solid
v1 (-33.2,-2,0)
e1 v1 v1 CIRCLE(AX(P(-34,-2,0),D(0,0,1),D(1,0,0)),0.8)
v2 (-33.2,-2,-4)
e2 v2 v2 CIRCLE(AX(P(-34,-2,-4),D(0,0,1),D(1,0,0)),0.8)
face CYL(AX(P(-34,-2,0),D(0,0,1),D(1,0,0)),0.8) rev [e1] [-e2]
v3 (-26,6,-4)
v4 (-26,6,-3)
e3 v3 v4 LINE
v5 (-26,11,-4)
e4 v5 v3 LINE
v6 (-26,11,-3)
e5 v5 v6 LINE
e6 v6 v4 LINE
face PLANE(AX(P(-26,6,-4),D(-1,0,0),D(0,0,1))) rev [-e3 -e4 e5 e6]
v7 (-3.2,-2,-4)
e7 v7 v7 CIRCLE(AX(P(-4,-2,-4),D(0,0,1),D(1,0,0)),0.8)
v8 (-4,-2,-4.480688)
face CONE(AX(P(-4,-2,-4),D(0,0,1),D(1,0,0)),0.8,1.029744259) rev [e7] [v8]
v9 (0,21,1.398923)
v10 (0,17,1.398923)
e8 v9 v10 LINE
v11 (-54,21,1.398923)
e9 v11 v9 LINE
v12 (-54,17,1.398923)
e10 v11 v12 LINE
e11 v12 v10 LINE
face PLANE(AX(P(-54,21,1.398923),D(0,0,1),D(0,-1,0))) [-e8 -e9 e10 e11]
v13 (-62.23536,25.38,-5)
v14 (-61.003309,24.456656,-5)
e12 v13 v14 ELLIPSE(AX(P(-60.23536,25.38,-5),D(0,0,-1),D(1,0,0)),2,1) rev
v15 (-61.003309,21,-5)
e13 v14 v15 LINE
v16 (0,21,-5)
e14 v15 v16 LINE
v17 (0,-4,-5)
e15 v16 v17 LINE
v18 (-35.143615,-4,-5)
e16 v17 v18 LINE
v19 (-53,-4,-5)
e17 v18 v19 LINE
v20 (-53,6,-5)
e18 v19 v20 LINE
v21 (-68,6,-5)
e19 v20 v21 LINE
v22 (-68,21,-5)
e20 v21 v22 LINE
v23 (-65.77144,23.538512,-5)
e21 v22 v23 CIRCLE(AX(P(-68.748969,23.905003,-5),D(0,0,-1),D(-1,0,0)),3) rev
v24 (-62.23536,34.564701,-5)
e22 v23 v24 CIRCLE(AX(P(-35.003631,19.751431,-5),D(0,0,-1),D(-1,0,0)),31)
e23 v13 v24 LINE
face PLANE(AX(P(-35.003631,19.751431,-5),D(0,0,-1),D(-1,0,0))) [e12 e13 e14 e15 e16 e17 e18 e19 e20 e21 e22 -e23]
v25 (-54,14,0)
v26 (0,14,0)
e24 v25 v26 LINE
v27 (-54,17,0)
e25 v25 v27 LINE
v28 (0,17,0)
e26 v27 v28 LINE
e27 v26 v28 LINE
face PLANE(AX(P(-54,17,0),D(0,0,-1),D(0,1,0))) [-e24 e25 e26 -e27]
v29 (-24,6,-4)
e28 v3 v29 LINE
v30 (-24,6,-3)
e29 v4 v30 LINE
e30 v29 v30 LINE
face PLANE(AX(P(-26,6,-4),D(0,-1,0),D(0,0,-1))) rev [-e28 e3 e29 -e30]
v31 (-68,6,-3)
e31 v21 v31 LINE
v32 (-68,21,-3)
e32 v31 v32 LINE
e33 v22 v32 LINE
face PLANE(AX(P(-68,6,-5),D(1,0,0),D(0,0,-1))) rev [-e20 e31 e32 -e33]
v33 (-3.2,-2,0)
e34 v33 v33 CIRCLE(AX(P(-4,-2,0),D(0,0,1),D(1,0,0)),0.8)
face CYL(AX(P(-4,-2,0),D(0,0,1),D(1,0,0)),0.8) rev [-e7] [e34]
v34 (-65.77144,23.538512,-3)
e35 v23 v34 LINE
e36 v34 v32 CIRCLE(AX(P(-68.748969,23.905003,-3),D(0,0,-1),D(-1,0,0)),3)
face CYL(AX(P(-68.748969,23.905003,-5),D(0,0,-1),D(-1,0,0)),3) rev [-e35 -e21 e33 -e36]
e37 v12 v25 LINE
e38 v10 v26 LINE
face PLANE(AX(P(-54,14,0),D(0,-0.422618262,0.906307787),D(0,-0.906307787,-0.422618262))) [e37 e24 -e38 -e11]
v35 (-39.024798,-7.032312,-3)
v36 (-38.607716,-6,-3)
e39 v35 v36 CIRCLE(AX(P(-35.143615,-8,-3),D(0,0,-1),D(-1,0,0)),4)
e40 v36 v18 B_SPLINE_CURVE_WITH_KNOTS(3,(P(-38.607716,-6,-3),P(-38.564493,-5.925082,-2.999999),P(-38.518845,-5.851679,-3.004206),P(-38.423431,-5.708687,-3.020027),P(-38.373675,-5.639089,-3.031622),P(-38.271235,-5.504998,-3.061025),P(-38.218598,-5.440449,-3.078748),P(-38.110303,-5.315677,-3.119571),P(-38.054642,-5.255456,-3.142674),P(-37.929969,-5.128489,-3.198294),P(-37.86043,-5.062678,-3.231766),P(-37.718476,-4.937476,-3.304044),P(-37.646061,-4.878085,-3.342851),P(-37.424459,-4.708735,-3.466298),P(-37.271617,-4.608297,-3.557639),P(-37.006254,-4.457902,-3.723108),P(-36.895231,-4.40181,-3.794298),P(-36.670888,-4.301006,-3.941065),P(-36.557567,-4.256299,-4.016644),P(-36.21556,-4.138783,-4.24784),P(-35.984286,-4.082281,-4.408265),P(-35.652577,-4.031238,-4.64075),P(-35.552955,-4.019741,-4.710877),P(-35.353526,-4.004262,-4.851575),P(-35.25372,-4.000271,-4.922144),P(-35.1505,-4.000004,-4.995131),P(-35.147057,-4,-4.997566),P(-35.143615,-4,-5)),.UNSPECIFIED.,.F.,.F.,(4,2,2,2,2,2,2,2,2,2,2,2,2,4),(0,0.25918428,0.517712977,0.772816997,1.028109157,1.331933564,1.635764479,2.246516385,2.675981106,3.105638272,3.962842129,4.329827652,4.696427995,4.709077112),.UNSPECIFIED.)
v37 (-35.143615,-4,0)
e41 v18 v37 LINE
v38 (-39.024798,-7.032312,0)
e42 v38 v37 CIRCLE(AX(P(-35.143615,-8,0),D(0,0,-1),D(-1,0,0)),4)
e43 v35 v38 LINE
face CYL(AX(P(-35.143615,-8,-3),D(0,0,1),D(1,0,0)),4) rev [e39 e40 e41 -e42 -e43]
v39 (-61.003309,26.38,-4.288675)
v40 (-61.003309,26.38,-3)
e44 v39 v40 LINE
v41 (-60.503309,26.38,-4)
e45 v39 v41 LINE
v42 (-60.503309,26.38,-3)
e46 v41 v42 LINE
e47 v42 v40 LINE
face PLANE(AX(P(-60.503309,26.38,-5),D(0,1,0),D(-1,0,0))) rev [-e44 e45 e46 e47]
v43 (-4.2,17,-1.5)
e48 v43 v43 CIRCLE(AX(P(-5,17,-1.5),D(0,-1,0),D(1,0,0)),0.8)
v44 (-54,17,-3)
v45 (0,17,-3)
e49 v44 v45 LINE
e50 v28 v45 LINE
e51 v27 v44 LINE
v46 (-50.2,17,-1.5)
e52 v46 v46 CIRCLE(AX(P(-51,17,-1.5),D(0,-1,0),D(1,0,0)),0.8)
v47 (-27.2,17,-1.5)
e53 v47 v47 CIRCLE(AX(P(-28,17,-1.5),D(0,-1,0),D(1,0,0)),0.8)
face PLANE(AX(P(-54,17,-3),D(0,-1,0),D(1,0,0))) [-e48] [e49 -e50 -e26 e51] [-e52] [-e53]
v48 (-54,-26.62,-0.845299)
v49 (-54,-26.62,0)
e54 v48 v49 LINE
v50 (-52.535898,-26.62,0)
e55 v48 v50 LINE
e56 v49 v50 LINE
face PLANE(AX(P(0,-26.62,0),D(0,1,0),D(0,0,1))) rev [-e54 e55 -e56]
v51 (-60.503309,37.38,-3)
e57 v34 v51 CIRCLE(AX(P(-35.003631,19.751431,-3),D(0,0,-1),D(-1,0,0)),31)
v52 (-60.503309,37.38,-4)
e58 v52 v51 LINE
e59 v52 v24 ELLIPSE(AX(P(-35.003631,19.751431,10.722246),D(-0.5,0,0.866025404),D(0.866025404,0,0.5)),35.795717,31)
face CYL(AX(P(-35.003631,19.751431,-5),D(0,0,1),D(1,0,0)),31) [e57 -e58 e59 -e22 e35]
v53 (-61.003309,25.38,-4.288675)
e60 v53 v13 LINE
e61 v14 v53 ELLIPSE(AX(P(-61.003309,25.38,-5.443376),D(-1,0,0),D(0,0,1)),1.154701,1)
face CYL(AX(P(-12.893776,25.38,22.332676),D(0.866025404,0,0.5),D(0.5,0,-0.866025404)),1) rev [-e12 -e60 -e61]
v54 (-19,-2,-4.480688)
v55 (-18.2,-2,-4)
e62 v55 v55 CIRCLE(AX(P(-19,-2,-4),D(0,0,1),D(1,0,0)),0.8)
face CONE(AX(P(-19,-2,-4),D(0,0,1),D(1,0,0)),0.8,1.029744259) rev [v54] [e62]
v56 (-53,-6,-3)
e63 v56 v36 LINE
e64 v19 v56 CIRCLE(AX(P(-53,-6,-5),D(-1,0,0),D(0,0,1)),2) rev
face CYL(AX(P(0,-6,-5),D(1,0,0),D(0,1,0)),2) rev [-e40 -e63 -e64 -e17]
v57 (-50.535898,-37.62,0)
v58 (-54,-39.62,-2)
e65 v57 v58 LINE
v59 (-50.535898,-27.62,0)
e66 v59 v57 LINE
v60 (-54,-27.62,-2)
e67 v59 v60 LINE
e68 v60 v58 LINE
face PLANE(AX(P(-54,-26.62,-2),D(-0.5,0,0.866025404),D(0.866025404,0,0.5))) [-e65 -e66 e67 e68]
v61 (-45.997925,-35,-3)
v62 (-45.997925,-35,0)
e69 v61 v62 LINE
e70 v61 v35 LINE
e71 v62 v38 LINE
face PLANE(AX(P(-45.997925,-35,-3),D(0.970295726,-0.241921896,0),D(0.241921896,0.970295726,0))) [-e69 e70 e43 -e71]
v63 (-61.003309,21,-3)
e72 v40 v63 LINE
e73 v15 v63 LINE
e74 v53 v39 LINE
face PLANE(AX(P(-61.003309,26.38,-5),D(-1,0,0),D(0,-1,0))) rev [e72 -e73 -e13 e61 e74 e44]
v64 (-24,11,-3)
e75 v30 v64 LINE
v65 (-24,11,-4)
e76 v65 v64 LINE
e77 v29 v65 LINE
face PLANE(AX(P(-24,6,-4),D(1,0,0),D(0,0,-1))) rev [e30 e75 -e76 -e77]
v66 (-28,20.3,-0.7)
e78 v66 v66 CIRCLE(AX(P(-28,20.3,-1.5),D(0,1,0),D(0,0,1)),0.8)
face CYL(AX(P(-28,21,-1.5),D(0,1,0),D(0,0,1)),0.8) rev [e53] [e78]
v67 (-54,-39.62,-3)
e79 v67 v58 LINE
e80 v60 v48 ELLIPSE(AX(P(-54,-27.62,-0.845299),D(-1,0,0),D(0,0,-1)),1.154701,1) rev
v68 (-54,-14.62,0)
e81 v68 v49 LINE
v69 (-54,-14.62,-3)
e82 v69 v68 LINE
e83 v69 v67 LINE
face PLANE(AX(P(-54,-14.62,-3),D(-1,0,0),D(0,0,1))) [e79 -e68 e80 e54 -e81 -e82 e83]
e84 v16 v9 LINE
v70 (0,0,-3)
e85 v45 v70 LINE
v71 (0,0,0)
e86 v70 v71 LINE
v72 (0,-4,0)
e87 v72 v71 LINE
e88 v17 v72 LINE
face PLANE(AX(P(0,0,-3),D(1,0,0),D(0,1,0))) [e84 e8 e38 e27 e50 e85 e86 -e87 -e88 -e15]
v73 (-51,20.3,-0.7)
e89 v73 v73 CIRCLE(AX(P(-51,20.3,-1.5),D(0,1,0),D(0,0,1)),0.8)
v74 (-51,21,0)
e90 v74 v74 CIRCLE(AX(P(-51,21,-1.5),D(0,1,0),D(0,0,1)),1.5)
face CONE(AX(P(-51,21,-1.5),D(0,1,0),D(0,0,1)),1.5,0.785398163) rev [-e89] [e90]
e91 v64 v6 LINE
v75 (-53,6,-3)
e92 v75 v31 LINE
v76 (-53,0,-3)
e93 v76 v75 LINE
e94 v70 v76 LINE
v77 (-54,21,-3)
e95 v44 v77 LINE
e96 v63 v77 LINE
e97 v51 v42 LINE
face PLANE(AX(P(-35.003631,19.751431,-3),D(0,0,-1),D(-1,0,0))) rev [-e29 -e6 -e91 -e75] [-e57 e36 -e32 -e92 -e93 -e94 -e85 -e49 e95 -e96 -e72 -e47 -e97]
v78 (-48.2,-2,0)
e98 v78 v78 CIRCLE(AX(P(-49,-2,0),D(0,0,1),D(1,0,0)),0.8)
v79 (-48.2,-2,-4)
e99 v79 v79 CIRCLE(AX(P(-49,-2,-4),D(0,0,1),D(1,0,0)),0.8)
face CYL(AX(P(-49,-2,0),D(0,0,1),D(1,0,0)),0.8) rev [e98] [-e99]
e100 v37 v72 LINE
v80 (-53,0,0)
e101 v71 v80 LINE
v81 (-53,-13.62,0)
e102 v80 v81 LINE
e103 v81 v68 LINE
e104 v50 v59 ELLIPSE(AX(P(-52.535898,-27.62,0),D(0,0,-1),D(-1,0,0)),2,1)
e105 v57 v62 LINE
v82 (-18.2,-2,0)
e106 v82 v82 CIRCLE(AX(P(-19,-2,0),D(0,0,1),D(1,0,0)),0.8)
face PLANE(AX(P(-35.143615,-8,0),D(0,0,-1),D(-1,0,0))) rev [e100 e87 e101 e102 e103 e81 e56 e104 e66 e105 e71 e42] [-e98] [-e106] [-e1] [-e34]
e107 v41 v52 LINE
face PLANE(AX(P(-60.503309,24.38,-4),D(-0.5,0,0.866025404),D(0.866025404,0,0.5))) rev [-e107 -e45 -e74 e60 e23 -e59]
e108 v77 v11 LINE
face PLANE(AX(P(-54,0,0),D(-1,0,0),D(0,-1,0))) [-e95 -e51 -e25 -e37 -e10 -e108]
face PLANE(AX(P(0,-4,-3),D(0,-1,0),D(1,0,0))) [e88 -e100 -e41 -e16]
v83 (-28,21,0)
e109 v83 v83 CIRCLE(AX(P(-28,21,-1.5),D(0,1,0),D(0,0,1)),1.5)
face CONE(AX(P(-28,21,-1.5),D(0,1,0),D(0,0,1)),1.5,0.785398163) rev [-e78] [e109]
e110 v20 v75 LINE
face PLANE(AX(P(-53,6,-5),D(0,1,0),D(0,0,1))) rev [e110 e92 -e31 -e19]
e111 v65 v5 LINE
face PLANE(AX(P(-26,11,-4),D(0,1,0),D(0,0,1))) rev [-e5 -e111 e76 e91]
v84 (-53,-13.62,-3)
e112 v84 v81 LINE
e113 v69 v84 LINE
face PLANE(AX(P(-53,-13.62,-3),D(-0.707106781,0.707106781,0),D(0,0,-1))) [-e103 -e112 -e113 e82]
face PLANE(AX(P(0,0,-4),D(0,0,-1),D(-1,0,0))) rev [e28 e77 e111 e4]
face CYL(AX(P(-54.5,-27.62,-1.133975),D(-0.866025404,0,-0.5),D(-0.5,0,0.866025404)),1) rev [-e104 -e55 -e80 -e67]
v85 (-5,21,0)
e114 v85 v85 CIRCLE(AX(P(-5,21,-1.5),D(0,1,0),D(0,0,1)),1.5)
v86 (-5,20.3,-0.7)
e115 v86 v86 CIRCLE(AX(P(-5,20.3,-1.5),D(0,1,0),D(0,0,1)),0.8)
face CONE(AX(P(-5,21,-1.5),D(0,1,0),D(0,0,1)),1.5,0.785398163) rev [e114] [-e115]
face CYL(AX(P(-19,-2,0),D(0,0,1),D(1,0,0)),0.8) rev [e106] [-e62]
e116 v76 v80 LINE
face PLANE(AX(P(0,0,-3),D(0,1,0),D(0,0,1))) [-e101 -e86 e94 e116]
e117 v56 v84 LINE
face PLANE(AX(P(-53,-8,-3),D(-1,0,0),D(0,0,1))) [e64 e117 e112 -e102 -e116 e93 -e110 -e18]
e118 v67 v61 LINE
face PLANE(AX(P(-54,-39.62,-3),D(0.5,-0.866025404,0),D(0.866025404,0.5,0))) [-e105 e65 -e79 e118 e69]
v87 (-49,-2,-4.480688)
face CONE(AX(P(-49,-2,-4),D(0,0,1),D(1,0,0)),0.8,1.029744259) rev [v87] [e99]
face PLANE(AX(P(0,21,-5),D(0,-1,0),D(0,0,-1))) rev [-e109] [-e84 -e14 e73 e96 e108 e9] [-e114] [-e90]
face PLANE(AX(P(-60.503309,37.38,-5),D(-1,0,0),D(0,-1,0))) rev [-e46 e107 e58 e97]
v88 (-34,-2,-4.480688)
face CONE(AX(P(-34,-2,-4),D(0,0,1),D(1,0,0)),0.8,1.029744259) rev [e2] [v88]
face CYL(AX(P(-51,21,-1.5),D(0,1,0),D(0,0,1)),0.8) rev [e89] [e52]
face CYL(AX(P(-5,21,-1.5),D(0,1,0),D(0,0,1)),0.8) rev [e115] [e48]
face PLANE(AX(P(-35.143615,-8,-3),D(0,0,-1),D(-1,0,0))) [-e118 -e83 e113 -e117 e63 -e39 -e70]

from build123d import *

# Parameters (mm, degrees)
EXTRUDE_1_DEPTH              = 3
EXTRUDE_2_DEPTH              = 2
FILLET_1_R                   = 2
FILLET_2_R                   = 3
CHAMFER_1_SIZE               = 1
EXTRUDE_3_DEPTH              = 54
PATTERN_LINEAR_1_COUNT       = 4
PATTERN_LINEAR_1_PITCH       = 15
HOLE_WIZARD_M2_2_D           = 1.6
HOLE_WIZARD_M2_2_DEPTH       = 4
HOLE_WIZARD_M2_2_CSINK_D     = 3
HOLE_WIZARD_M2_2_CSINK_ANGLE = 90
PATTERN_LINEAR_2_COUNT       = 3
PATTERN_LINEAR_2_PITCH       = 23
CUT_EXTRUDE_1_DEPTH          = 13
FILLET_3_R                   = 1
CUT_EXTRUDE_2_DEPTH          = 13
FILLET_4_R                   = 1
SKETCH_11_W                  = 2.000000000000007
SKETCH_11_H                  = 5
CUT_EXTRUDE_3_DEPTH          = 1


# Some blends are built 0.0001 mm under size
with BuildPart() as part:
    # 草图1 → 凸台-拉伸1 (new body)
    with BuildSketch(Plane.XY):
        with BuildLine():
            Line((-53, -8.000000000000004), (-53, -14.620000000000001))
            Line((-53, -14.620000000000001), (-54, -14.620000000000001))
            Line((-54, -14.620000000000001), (-54, -39.62))
            Line((-54, -39.62), (-45.9979252690319, -35.00000000000001))
            Line((-45.9979252690319, -35.00000000000001), (-39.02479757997029, -7.032312417601319))
            ThreePointArc((-39.02479757997029, -7.032312417601319), (-37.606260576168935, -4.847956985573115), (-35.14361467486631, -4.000000000000005))
            Line((-35.14361467486631, -4.000000000000005), (4.9e-16, -4))
            Line((4.9e-16, -4), (0, 0))
            Line((0, 0), (-53, 0))
            Line((-53, 0), (-53, -8.000000000000004))
        make_face()
    extrude(amount=-EXTRUDE_1_DEPTH)

    # 草图2 → 凸台-拉伸2 (add)
    with BuildSketch(Plane(origin=(0, 0, -3), x_dir=(-1, 0, 0), z_dir=(0, 0, -1))):
        with BuildLine():
            Line((-4.9e-16, -4), (53, -4))
            Line((53, -4), (53, 6.000000000000002))
            Line((53, 6.000000000000002), (68, 6.000000000000002))
            Line((68, 6.000000000000002), (68, 21))
            Line((68, 21), (65.97847727, 21.000000000000004))
            ThreePointArc((65.97847727, 21.000000000000004), (64.40463560690391, 29.57899182713432), (60.50330893032099, 37.379999999999995))
            Line((60.50330893032099, 37.379999999999995), (60.503308930321, 26.379999999999995))
            Line((60.503308930321, 26.379999999999995), (61.003308930321, 26.38))
            Line((61.003308930321, 26.38), (61.003308930321005, 21))
            Line((61.003308930321005, 21), (53, 21))
            Line((53, 21), (0, 21))
            Line((0, 21), (-4.9e-16, -4))
        make_face()
    extrude(amount=EXTRUDE_2_DEPTH)

    # 圆角1
    fillet_1_edges = [part.edges().sort_by_distance(p)[0] for p in [
        (-44.07180733743316, -4, -3),
    ]]
    fillet(fillet_1_edges, radius=FILLET_1_R - 0.0001)  # a hair under: the kernel refuses the full size

    # 圆角2
    # the kernel refuses this fillet: 3 mm, written as the material it adds along each edge
    with BuildSketch(Plane(origin=(-65.97847727, 21.000000000000004, -3), x_dir=(-1, -3.51e-15, 0), z_dir=(0, 0, -1))) as fillet_2_piece_1:
        with BuildLine():
            CenterArc((2.7704921372998013, 2.9050034125503172), FILLET_2_R, 187.01700367904854, 68.52581158586304)
            Line((-0.2070376849391327, 2.5385117241346675), (-0.2665882813839122, 2.531181890366354))
            ThreePointArc((-0.2665882813839122, 2.531181890366354), (-0.13723895323484658, 1.2665056940841235), (-0.05995131454466218, -0.00241658526998755))
            Line((-0.05995131454466218, -0.00241658526998755), (2.1e-16, -0.05999999999999872))
            ThreePointArc((2.1e-16, -0.05999999999999872), (1.0107613649999936, -0.05999999999999517), (2.006543341853998, -0.05810006825100805))
            Line((2.006543341853998, -0.05810006825100805), (2.021522730000001, 0))
        make_face()
    extrude(amount=2)

    # 倒角1
    chamfer_1_edges = [part.edges().sort_by_distance(p)[0] for p in [
        (-53, -14.620000000000001, -1.5),
    ]]
    chamfer(chamfer_1_edges, length=CHAMFER_1_SIZE - 0.0001)  # a hair under: the kernel refuses the full size

    # 草图3 → 凸台-拉伸3 (add)
    with BuildSketch(Plane(origin=(0, 0, 0), x_dir=(0, 0, -1), z_dir=(1, 1.2e-16, 0))):
        Polygon((1.3e-15, 17), (1.73e-15, 14.000000000000002), (-1.3989229744649714, 17), (-1.3989229744649718, 21), (3, 21), (3.0000000000000018, 17), align=None)
    extrude(amount=-EXTRUDE_3_DEPTH)

    # 草图6 → M2 螺纹孔1 (revolve, cut)
    with BuildSketch(Plane(origin=(-4, -1.9999999999999967, 0), x_dir=(0, -1, 0), z_dir=(1, 0, 0))):
        Polygon((0, 0), (-1.1e-15, 4.480688495222049), (0.7999999999999986, 4), (0.7999999999999899, -1.46e-15), align=None)
    hole_wizard_m2_1 = revolve(axis=Axis((-4, -1.9999999999999967, 6.349999999999991), (0, 0, -1)), mode=Mode.SUBTRACT)

    # 阵列(线性)1: M2 螺纹孔1 ×4
    with Locations(*[(-i * PATTERN_LINEAR_1_PITCH, 0, 0) for i in range(1, PATTERN_LINEAR_1_COUNT)]):
        add(hole_wizard_m2_1, mode=Mode.SUBTRACT)

    # M2 螺纹孔2
    with Locations(Plane(origin=(0, 21, 0), x_dir=(1, 0, 0), z_dir=(0, 1, 0))):
        with Locations((-5, 1.5)):
            hole_wizard_m2_2 = CounterSinkHole(HOLE_WIZARD_M2_2_D / 2, HOLE_WIZARD_M2_2_CSINK_D / 2, depth=HOLE_WIZARD_M2_2_DEPTH, counter_sink_angle=HOLE_WIZARD_M2_2_CSINK_ANGLE)

    # 阵列(线性)2: M2 螺纹孔2 ×3
    with Locations(*[(-i * PATTERN_LINEAR_2_PITCH, 0, 0) for i in range(1, PATTERN_LINEAR_2_COUNT)]):
        add(hole_wizard_m2_2, mode=Mode.SUBTRACT)

    # 草图9 → 切除-拉伸1 (cut)
    with BuildSketch(Plane(origin=(3.89e-15, 37.37999999999999, 7.21e-15), x_dir=(1, -1e-16, 0), z_dir=(1e-16, 1, 1.9e-16))):
        Polygon((-60.503308930321, 4.000000000000004), (-62.23535973788988, 5.000000000000007), (-60.503308930321, 5.000000000000007), align=None)
    extrude(amount=-CUT_EXTRUDE_1_DEPTH, mode=Mode.SUBTRACT)

    # 圆角3
    # the kernel refuses this fillet: 1 mm, written as the material it adds along each edge
    with BuildSketch(Plane(origin=(-58.8382454208599, 24.379999999999995, -3.0386751345948144), x_dir=(1.6e-16, 1, 9e-17), z_dir=(-0.8660254037844387, 0, -0.5))) as fillet_3_piece_1_section:
        with BuildLine():
            CenterArc((FILLET_3_R, FILLET_3_R), FILLET_3_R, 179.99999999999997, 90)
            Line((0, FILLET_3_R), (0, 0))
            Line((0, 0), (FILLET_3_R, 0))
        make_face()
    fillet_3_piece_1 = extrude(amount=6.422649730810377, mode=Mode.PRIVATE)
    fillet_3_piece_1 = split(fillet_3_piece_1, bisect_by=Plane(origin=(-61.495158067637725, 24.669870904160934, -5), z_dir=(0, 0, 1)), keep=Keep.TOP, mode=Mode.PRIVATE)
    fillet_3_piece_1 = split(fillet_3_piece_1, bisect_by=Plane(origin=(-61.003308930321, 24.669870904160934, -4.716030766640193), z_dir=(-1, 1.32e-15, 0)), keep=Keep.TOP, mode=Mode.PRIVATE)
    add(fillet_3_piece_1)

    # 草图10 → 切除-拉伸2 (cut)
    with BuildSketch(Plane(origin=(0, -39.62, 0), x_dir=(1, 0, 0), z_dir=(0, 1, 0))):
        Polygon((-54, 2), (-50.53589838486226, 0), (-54, 1.73e-15), align=None)
    extrude(amount=CUT_EXTRUDE_2_DEPTH, mode=Mode.SUBTRACT)

    # 圆角4
    fillet_4_edges = [part.edges().sort_by_distance(p)[0] for p in [
        (-52.26794919243113, -26.619999999999997, -1),
    ]]
    fillet(fillet_4_edges, radius=FILLET_4_R)

    # 草图11 → 切除-拉伸3 (cut)
    with BuildSketch(Plane.XY.offset(-3)):
        with Locations((-25, 8.5)):
            Rectangle(SKETCH_11_W, SKETCH_11_H)
    extrude(amount=-CUT_EXTRUDE_3_DEPTH, mode=Mode.SUBTRACT)


solid = part.part
